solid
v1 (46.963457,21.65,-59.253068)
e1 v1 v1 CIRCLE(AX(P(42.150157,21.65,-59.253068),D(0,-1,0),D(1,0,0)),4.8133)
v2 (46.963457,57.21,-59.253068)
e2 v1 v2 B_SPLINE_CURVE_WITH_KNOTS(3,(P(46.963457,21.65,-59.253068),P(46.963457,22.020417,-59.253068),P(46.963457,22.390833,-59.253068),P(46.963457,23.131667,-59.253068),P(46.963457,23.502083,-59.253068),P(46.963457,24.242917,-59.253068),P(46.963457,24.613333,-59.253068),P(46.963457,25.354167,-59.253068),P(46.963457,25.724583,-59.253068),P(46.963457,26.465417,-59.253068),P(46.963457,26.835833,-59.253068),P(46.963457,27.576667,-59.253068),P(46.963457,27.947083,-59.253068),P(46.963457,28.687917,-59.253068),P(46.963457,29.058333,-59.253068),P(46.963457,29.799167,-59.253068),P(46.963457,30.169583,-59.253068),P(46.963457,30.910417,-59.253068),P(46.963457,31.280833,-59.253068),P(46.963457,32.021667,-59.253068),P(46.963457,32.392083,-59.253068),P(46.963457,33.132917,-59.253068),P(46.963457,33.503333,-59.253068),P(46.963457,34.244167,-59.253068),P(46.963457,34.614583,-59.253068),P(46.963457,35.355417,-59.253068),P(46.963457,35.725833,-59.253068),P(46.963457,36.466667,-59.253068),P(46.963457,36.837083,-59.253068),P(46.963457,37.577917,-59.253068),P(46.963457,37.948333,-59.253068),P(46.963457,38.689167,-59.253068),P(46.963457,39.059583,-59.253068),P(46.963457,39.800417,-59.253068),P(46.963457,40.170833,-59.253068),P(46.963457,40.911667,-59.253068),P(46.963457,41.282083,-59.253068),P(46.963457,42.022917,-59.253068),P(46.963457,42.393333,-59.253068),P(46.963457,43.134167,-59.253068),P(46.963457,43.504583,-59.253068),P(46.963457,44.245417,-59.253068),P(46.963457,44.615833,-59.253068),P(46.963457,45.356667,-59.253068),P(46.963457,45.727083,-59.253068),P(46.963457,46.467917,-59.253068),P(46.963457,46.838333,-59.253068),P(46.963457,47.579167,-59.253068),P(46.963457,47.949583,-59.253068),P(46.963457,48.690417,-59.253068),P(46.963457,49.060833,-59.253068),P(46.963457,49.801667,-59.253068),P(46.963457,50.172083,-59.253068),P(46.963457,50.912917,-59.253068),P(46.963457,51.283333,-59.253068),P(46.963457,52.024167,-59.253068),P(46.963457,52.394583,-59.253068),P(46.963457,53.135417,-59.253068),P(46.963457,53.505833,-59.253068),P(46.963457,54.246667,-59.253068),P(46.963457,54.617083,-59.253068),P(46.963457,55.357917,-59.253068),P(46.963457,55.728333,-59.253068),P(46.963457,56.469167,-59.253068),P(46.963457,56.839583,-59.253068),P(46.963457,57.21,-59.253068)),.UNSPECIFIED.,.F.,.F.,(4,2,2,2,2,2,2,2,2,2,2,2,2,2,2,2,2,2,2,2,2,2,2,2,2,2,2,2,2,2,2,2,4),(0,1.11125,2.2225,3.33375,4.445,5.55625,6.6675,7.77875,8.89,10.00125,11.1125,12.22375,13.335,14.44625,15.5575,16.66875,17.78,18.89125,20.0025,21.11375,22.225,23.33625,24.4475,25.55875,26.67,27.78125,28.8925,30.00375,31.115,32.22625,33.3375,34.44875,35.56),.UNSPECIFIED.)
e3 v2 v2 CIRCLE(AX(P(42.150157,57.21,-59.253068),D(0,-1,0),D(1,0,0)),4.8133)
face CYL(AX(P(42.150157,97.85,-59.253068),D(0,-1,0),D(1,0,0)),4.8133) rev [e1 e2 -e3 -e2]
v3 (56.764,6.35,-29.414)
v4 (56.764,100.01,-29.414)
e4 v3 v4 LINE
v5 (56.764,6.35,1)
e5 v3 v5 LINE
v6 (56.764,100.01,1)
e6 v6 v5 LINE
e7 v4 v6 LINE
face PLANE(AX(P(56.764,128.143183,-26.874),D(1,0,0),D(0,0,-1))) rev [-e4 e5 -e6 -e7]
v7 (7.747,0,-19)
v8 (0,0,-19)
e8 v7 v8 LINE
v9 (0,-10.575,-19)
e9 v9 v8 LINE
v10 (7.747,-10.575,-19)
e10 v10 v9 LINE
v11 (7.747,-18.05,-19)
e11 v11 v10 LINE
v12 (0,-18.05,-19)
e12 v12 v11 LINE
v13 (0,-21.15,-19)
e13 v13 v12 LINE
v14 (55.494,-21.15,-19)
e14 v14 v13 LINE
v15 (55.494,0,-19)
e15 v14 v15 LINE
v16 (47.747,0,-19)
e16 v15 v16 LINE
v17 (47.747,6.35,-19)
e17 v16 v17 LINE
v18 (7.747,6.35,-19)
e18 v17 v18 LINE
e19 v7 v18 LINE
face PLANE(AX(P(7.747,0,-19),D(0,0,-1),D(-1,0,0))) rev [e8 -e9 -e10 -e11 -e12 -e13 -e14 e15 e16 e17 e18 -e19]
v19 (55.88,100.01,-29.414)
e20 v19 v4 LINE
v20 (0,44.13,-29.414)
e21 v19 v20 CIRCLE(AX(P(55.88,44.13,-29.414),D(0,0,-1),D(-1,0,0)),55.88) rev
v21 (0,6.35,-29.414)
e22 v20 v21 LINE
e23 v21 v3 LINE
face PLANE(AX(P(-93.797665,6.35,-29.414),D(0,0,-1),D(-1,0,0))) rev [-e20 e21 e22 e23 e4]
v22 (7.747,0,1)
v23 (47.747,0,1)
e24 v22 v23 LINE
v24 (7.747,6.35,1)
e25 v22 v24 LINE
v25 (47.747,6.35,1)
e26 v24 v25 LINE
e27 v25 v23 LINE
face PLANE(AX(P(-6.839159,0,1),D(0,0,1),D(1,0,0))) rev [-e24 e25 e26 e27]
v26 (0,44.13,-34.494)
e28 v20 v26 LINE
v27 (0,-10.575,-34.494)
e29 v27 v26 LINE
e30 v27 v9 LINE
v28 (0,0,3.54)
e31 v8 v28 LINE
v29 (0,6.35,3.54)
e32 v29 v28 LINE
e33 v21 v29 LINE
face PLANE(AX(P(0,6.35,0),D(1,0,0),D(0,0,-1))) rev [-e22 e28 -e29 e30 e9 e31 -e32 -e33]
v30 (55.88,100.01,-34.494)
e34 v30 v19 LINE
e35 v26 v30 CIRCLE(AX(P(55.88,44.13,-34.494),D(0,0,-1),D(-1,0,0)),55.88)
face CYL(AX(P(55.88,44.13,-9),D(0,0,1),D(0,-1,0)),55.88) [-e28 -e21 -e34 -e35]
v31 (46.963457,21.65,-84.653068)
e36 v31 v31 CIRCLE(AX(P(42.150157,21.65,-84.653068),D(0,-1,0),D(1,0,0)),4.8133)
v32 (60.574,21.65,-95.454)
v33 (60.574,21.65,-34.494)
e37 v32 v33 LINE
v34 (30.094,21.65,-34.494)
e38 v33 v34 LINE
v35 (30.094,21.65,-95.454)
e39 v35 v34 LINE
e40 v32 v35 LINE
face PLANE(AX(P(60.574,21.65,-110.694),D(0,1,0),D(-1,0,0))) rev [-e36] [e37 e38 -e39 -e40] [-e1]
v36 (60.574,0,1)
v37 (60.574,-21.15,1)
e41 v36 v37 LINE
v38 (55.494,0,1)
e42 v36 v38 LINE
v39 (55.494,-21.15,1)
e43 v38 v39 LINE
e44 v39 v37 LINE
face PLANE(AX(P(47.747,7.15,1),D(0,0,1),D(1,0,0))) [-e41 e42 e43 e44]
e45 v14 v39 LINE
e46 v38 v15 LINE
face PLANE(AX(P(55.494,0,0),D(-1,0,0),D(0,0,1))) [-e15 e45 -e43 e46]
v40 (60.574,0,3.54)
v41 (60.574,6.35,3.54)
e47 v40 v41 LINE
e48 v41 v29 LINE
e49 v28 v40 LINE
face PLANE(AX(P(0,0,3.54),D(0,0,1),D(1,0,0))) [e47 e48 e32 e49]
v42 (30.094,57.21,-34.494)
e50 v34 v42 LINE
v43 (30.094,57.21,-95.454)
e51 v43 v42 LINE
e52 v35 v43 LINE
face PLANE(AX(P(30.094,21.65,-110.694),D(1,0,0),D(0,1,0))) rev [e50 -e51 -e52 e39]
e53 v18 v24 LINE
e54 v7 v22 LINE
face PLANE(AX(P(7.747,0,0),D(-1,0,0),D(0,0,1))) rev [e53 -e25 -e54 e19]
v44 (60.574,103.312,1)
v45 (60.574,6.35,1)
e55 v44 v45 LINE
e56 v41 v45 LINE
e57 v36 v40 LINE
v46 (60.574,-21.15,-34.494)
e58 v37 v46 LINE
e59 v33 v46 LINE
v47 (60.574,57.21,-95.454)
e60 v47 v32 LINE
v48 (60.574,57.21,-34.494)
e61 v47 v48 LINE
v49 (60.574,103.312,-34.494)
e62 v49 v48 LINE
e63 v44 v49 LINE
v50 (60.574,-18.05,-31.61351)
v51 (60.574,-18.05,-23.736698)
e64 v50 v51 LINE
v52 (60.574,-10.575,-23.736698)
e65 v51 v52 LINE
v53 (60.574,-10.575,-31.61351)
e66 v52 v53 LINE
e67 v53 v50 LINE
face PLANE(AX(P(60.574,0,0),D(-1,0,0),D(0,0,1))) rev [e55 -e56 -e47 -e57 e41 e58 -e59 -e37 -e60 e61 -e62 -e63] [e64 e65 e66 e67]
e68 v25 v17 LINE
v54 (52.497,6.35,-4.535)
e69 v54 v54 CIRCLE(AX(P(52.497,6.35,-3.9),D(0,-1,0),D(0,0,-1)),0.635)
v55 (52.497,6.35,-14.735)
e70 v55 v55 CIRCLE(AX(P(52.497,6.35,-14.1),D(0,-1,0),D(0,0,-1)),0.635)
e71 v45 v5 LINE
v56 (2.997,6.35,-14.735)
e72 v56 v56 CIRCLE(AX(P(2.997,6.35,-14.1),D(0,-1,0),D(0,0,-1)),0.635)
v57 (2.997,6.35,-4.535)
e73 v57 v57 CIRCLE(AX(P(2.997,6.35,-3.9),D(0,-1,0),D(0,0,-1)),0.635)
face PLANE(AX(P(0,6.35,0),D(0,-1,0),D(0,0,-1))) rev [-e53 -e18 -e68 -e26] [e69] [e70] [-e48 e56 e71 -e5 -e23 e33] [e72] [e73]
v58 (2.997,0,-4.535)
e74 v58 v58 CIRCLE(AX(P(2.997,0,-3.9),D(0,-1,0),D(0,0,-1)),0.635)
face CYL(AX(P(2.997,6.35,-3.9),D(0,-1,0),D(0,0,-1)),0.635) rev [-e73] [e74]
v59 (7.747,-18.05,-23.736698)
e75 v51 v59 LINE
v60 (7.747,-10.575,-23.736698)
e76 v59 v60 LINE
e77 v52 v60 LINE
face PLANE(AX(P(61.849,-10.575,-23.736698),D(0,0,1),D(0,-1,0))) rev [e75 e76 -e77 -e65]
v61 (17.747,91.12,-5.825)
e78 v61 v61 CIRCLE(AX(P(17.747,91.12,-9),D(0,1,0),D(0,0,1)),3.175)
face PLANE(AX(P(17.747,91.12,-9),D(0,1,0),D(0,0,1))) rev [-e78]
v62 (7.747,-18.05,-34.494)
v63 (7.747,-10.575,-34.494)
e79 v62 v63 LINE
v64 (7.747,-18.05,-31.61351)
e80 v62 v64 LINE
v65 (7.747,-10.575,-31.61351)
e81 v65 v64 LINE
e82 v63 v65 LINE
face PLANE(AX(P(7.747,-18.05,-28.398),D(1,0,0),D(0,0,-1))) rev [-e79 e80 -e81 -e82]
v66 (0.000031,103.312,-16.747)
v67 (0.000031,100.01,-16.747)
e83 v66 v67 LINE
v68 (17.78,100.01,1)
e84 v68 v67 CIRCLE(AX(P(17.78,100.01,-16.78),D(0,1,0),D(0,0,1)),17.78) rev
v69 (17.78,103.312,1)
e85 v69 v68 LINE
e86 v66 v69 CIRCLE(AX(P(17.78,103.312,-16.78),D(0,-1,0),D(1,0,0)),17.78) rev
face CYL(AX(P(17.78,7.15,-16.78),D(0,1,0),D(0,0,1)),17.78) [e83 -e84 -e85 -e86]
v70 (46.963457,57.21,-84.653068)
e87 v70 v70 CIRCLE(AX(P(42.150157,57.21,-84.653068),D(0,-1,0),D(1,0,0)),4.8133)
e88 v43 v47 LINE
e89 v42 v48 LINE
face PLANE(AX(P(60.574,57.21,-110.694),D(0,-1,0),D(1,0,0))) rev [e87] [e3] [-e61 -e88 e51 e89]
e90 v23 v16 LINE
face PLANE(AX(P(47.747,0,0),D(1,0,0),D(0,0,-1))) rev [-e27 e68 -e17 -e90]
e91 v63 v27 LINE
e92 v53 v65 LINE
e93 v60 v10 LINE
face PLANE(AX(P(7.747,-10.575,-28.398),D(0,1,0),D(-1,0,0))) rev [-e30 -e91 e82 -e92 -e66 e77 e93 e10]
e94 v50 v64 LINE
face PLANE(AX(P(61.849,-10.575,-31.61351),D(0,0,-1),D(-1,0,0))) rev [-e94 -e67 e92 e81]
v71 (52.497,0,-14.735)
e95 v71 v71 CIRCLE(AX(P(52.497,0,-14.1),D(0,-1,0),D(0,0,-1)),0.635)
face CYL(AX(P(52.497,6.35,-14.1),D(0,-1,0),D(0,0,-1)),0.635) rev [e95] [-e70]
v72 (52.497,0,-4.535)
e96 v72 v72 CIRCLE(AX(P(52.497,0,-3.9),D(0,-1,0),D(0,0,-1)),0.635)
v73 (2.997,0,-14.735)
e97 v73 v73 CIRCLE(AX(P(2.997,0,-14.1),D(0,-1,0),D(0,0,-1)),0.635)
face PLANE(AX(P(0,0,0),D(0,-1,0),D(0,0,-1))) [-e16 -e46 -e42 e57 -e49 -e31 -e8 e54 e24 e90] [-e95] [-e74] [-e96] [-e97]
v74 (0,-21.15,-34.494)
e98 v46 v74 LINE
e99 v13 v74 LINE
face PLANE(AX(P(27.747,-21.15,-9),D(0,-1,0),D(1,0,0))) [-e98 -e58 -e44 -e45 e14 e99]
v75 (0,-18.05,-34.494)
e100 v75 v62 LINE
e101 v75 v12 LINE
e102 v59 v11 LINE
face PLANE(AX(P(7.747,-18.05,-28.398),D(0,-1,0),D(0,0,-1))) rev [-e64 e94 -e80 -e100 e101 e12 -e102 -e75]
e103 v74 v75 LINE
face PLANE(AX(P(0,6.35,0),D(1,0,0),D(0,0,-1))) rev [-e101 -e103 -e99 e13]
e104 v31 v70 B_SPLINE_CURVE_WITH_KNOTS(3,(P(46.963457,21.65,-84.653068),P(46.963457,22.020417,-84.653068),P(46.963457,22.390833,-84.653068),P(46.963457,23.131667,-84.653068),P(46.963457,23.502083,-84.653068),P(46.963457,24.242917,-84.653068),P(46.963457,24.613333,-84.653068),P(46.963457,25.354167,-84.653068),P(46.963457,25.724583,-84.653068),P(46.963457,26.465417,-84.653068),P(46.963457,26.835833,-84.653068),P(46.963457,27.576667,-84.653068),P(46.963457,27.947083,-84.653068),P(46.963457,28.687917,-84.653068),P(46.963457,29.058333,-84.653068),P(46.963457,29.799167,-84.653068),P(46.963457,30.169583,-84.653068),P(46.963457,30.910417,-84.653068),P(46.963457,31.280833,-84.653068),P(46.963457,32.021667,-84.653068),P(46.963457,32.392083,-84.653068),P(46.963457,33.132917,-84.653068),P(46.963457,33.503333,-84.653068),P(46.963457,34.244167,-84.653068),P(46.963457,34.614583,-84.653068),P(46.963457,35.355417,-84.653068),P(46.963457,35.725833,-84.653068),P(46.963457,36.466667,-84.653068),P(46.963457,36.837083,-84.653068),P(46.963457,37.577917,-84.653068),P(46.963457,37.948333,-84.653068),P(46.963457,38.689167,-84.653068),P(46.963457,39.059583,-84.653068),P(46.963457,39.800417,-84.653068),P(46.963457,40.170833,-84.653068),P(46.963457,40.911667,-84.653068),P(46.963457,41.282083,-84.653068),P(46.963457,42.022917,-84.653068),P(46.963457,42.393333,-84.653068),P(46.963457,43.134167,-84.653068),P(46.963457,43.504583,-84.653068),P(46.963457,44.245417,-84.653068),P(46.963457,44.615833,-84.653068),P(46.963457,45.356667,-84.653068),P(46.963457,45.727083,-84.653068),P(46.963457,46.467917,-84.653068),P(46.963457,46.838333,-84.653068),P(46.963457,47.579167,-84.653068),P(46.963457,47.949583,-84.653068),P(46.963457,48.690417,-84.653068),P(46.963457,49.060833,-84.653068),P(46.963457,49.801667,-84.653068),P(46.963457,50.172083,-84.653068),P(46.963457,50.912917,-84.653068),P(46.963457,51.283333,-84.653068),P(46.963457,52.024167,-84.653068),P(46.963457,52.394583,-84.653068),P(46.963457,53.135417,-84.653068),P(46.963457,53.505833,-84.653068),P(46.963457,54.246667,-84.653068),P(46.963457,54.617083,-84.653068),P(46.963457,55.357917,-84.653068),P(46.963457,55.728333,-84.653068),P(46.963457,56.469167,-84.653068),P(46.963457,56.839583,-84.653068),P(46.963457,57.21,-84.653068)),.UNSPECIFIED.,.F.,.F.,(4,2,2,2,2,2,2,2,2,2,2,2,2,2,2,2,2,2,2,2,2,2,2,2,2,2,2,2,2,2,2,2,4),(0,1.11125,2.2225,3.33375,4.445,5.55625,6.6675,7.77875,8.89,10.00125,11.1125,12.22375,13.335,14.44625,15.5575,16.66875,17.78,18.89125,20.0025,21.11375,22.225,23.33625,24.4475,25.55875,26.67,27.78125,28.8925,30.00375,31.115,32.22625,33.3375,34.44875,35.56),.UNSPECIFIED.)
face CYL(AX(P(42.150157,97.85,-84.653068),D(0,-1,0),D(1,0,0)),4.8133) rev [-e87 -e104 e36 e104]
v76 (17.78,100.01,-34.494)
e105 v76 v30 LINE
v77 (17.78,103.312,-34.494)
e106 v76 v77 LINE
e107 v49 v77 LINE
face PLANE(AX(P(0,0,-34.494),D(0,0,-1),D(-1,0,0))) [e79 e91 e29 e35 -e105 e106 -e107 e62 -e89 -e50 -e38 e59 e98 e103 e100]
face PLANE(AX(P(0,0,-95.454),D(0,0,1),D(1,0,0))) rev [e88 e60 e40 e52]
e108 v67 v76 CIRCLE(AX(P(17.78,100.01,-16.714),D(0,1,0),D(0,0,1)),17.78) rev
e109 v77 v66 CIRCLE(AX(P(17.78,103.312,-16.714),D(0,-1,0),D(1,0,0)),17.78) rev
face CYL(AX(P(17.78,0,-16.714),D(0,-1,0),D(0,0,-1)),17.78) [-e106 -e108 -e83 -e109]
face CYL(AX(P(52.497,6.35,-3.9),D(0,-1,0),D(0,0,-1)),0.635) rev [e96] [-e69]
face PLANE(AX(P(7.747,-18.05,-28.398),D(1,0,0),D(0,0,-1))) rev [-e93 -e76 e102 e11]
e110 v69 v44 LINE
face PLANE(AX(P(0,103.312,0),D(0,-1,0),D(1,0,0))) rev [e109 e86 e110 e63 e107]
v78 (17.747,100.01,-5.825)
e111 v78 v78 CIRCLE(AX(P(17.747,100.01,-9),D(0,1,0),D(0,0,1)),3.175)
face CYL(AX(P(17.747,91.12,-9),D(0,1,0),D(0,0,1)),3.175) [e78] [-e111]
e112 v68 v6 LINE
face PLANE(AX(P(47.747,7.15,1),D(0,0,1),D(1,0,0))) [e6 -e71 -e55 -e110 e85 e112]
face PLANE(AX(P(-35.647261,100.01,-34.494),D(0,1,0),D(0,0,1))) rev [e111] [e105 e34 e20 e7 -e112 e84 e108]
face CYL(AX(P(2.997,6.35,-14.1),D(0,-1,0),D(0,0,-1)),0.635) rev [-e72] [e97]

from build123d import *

# Parameters (mm, degrees)
SKETCH1_W            = 55.49400001
SKETCH1_H            = 26.874
BOSS_EXTRUDE1_DEPTH  = 6.35
SKETCH2_W            = 40
SKETCH2_H            = 19
CUT_EXTRUDE1_DEPTH   = 6.35
SKETCH3_R            = 0.635
CUT_EXTRUDE2_DEPTH   = 6.35
SKETCH4_W            = 55.49400001
SKETCH4_H            = 7.874
BOSS_EXTRUDE2_DEPTH  = 21.15
SKETCH6_W            = 7.747000005
SKETCH6_H            = 6.35
BOSS_EXTRUDE3_DEPTH  = 1
SKETCH12_W           = 7.747000005
SKETCH12_H           = 7.475
CUT_EXTRUDE4_DEPTH   = 9.398
SKETCH13_W           = 7.747000005
SKETCH13_H           = 7.9
BOSS_EXTRUDE6_DEPTH  = 20
SKETCH14_W           = 27.874
SKETCH14_H           = 27.5
BOSS_EXTRUDE7_DEPTH  = 5.08
SKETCH16_W           = 3.81
SKETCH16_H           = 27.874
BOSS_EXTRUDE8_DEPTH  = 93.66
BOSS_EXTRUDE9_DEPTH  = 7.62
SKETCH18_W           = 5.08
SKETCH18_H           = 93.66
BOSS_EXTRUDE10_DEPTH = 56.76400001
SKETCH19_W           = 30.48
SKETCH19_H           = 35.56
BOSS_EXTRUDE11_DEPTH = 76.2
SKETCH20_R           = 4.813300002
SKETCH20_R_2         = 4.813299999
CUT_EXTRUDE5_DEPTH   = 76.2
SKETCH21_W           = 30.48
SKETCH21_H           = 35.56
CUT_EXTRUDE6_DEPTH   = 15.24
SKETCH23_W           = 7.876812164
SKETCH23_H           = 7.475
CUT_EXTRUDE7_DEPTH   = 54.102
FILLET1_R            = 55.88
SKETCH24_W           = 3.81
SKETCH24_H           = 35.494
BOSS_EXTRUDE12_DEPTH = 3.302
SKETCH25_W           = 35.494
SKETCH25_H           = 3.302
BOSS_EXTRUDE13_DEPTH = 56.76400001
FILLET2_R            = 17.78
SKETCH26_R           = 3.175
BOSS_EXTRUDE14_DEPTH = 8.89
SKETCH27_W           = 7.747000005
SKETCH27_H           = 20
CUT_EXTRUDE9_DEPTH   = 10.668
SKETCH28_W           = 7.747000005
SKETCH28_H           = 6.35
BOSS_EXTRUDE15_DEPTH = 2.54
SKETCH29_W           = 2.54
SKETCH29_H           = 6.35
BOSS_EXTRUDE16_DEPTH = 47.747000005
SKETCH30_W           = 2.54
SKETCH30_H           = 6.35
BOSS_EXTRUDE17_DEPTH = 5.08


with BuildPart() as part:
    # Sketch1 → Boss-Extrude1 (new body)
    with BuildSketch(Plane(origin=(0, 0, 0), x_dir=(1, 0, 0), z_dir=(0, 1, 0))):
        with Locations((27.747000005, 13.437)):
            Rectangle(SKETCH1_W, SKETCH1_H)
    extrude(amount=BOSS_EXTRUDE1_DEPTH)

    # Sketch2 → Cut-Extrude1 (cut)
    with BuildSketch(Plane(origin=(0, 6.35, 0), x_dir=(1, 0, 0), z_dir=(0, 1, 0))):
        with Locations((27.747000005, 9.5)):
            Rectangle(SKETCH2_W, SKETCH2_H)
    extrude(amount=-CUT_EXTRUDE1_DEPTH, mode=Mode.SUBTRACT)

    # Sketch3 → Cut-Extrude2 (cut)
    with BuildSketch(Plane.XZ):
        with Locations(Location((2.997000004, -14.099999999, 0), (0, 0, 270))):
            Circle(SKETCH3_R)
        with Locations(Location((2.997000004, -3.899999999, 0), (0, 0, 270))):
            Circle(SKETCH3_R)
        with Locations(Location((52.497000004, -14.099999999, 0), (0, 0, 270))):
            Circle(SKETCH3_R)
        with Locations(Location((52.497000004, -3.899999999, 0), (0, 0, 270))):
            Circle(SKETCH3_R)
    extrude(amount=-CUT_EXTRUDE2_DEPTH, mode=Mode.SUBTRACT)

    # Sketch4 → Boss-Extrude2 (add)
    with BuildSketch(Plane.XZ):
        with Locations((27.747000005, -22.937)):
            Rectangle(SKETCH4_W, SKETCH4_H)
    extrude(amount=BOSS_EXTRUDE2_DEPTH)

    # Sketch6 → Boss-Extrude3 (add)
    with BuildSketch(Plane.XY):
        with Locations((3.873500003, 3.175)):
            Rectangle(SKETCH6_W, SKETCH6_H)
        with Locations((51.620500007, 3.175)):
            Rectangle(SKETCH6_W, SKETCH6_H)
    extrude(amount=BOSS_EXTRUDE3_DEPTH)

    # Sketch12 → Cut-Extrude4 (cut)
    with BuildSketch(Plane.XY.offset(-19)):
        with Locations((3.873500003, -14.3125)):
            Rectangle(SKETCH12_W, SKETCH12_H)
    extrude(amount=-CUT_EXTRUDE4_DEPTH, mode=Mode.SUBTRACT)

    # Sketch13 → Boss-Extrude6 (add)
    with BuildSketch(Plane.XY.offset(-19)):
        with Locations((51.620500007, -17.2)):
            Rectangle(SKETCH13_W, SKETCH13_H)
    extrude(amount=BOSS_EXTRUDE6_DEPTH)

    # Sketch14 → Boss-Extrude7 (add)
    with BuildSketch(Plane(origin=(55.49400001, 0, 0), x_dir=(0, 0, -1), z_dir=(1, 0, 0))):
        with Locations((12.937, -7.4)):
            Rectangle(SKETCH14_W, SKETCH14_H)
    extrude(amount=BOSS_EXTRUDE7_DEPTH)

    # Sketch16 → Boss-Extrude8 (add)
    with BuildSketch(Plane(origin=(0, 6.35, 0), x_dir=(1, 0, 0), z_dir=(0, 1, 0))):
        with Locations((58.66900001, 12.937)):
            Rectangle(SKETCH16_W, SKETCH16_H)
    extrude(amount=BOSS_EXTRUDE8_DEPTH)

    # Sketch17 → Boss-Extrude9 (add)
    with BuildSketch(Plane(origin=(0, 0, -26.874), x_dir=(-1, 0, 0), z_dir=(0, 0, -1))):
        Polygon((0, -21.15), (0, -18.05), (-7.747000005, -18.05), (-7.747000005, -10.575), (0, -10.575), (0, 6.35), (-56.76400001, 6.35), (-56.76400001, 100.01), (-60.57400001, 100.01), (-60.57400001, -21.15), align=None)
    extrude(amount=BOSS_EXTRUDE9_DEPTH)

    # Sketch18 → Boss-Extrude10 (add)
    with BuildSketch(Plane.ZY.offset(-56.76400001)):
        with Locations((-31.954, 53.18)):
            Rectangle(SKETCH18_W, SKETCH18_H)
    extrude(amount=BOSS_EXTRUDE10_DEPTH)

    # Sketch19 → Boss-Extrude11 (add)
    with BuildSketch(Plane(origin=(0, 0, -34.494), x_dir=(-1, 0, 0), z_dir=(0, 0, -1))):
        with Locations((-45.33400001, 39.43)):
            Rectangle(SKETCH19_W, SKETCH19_H)
    extrude(amount=BOSS_EXTRUDE11_DEPTH)

    # Sketch20 → Cut-Extrude5 (cut)
    with BuildSketch(Plane.XZ.offset(-21.65)):
        with Locations((42.150157054, -59.253068288)):
            Circle(SKETCH20_R)
        with Locations((42.150157054, -84.653068288)):
            Circle(SKETCH20_R_2)
    extrude(amount=-CUT_EXTRUDE5_DEPTH, mode=Mode.SUBTRACT)

    # Sketch21 → Cut-Extrude6 (cut)
    with BuildSketch(Plane(origin=(0, 0, -110.694), x_dir=(-1, 0, 0), z_dir=(0, 0, -1))):
        with Locations((-45.33400001, 39.43)):
            Rectangle(SKETCH21_W, SKETCH21_H)
    extrude(amount=-CUT_EXTRUDE6_DEPTH, mode=Mode.SUBTRACT)

    # Sketch23 → Cut-Extrude7 (cut)
    with BuildSketch(Plane.ZY.offset(-7.747000005)):
        with Locations((-27.675104405, -14.3125)):
            Rectangle(SKETCH23_W, SKETCH23_H)
    extrude(amount=-CUT_EXTRUDE7_DEPTH, mode=Mode.SUBTRACT)

    # Fillet1
    fillet1_edges = [part.edges().sort_by_distance(p)[0] for p in [
        (0, 100.01, -31.954),
    ]]
    fillet(fillet1_edges, radius=FILLET1_R)

    # Sketch24 → Boss-Extrude12 (add)
    with BuildSketch(Plane(origin=(0, 100.01, 0), x_dir=(1, 0, 0), z_dir=(0, 1, 0))):
        with Locations((58.66900001, 16.747)):
            Rectangle(SKETCH24_W, SKETCH24_H)
    extrude(amount=BOSS_EXTRUDE12_DEPTH)

    # Sketch25 → Boss-Extrude13 (add)
    with BuildSketch(Plane.ZY.offset(-56.76400001)):
        with Locations((-16.747, 101.661)):
            Rectangle(SKETCH25_W, SKETCH25_H)
    extrude(amount=BOSS_EXTRUDE13_DEPTH)

    # Fillet2
    # the kernel refuses this fillet: 17.78 mm, written as the material it takes off along each edge
    with BuildSketch(Plane(origin=(0, 55.56, 1), x_dir=(0, 0, -1), z_dir=(0, 1, 0))) as fillet2_piece_1:
        with BuildLine():
            CenterArc((FILLET2_R, -FILLET2_R), FILLET2_R, 90, 90)
            Line((0, -FILLET2_R), (0, 0))
            Line((0, 0), (FILLET2_R, 0))
        make_face()
    extrude(amount=92.202000001, mode=Mode.SUBTRACT)
    with BuildSketch(Plane(origin=(0, 147.762, -34.494), x_dir=(0, 0, 1), z_dir=(0, -1, 0))) as fillet2_piece_2:
        with BuildLine():
            CenterArc((FILLET2_R, -FILLET2_R), FILLET2_R, 90, 90)
            Line((0, -FILLET2_R), (0, 0))
            Line((0, 0), (FILLET2_R, 0))
        make_face()
    extrude(amount=47.752, mode=Mode.SUBTRACT)

    # Sketch26 → Boss-Extrude14 (add)
    with BuildSketch(Plane(origin=(0, 100.01, 0), x_dir=(1, 0, 0), z_dir=(0, 1, 0))):
        with Locations(Location((17.747000004, 8.999999999, 0), (0, 0, 270))):
            Circle(SKETCH26_R)
    extrude(amount=-BOSS_EXTRUDE14_DEPTH)

    # Sketch27 → Cut-Extrude9 (cut)
    with BuildSketch(Plane.XZ.offset(21.15)):
        with Locations((51.620500007, -9)):
            Rectangle(SKETCH27_W, SKETCH27_H)
    extrude(amount=-CUT_EXTRUDE9_DEPTH, mode=Mode.SUBTRACT)

    # Sketch28 → Boss-Extrude15 (add)
    with BuildSketch(Plane.XY.offset(1)):
        with Locations((51.620500007, 3.175)):
            Rectangle(SKETCH28_W, SKETCH28_H)
    extrude(amount=BOSS_EXTRUDE15_DEPTH)

    # Sketch29 → Boss-Extrude16 (add)
    with BuildSketch(Plane.ZY.offset(-47.747000005)):
        with Locations((2.27, 3.175)):
            Rectangle(SKETCH29_W, SKETCH29_H)
    extrude(amount=BOSS_EXTRUDE16_DEPTH)

    # Sketch30 → Boss-Extrude17 (add)
    with BuildSketch(Plane(origin=(55.49400001, 0, 0), x_dir=(0, 0, -1), z_dir=(1, 0, 0))):
        with Locations((-2.27, 3.175)):
            Rectangle(SKETCH30_W, SKETCH30_H)
    extrude(amount=BOSS_EXTRUDE17_DEPTH)


solid = part.part
